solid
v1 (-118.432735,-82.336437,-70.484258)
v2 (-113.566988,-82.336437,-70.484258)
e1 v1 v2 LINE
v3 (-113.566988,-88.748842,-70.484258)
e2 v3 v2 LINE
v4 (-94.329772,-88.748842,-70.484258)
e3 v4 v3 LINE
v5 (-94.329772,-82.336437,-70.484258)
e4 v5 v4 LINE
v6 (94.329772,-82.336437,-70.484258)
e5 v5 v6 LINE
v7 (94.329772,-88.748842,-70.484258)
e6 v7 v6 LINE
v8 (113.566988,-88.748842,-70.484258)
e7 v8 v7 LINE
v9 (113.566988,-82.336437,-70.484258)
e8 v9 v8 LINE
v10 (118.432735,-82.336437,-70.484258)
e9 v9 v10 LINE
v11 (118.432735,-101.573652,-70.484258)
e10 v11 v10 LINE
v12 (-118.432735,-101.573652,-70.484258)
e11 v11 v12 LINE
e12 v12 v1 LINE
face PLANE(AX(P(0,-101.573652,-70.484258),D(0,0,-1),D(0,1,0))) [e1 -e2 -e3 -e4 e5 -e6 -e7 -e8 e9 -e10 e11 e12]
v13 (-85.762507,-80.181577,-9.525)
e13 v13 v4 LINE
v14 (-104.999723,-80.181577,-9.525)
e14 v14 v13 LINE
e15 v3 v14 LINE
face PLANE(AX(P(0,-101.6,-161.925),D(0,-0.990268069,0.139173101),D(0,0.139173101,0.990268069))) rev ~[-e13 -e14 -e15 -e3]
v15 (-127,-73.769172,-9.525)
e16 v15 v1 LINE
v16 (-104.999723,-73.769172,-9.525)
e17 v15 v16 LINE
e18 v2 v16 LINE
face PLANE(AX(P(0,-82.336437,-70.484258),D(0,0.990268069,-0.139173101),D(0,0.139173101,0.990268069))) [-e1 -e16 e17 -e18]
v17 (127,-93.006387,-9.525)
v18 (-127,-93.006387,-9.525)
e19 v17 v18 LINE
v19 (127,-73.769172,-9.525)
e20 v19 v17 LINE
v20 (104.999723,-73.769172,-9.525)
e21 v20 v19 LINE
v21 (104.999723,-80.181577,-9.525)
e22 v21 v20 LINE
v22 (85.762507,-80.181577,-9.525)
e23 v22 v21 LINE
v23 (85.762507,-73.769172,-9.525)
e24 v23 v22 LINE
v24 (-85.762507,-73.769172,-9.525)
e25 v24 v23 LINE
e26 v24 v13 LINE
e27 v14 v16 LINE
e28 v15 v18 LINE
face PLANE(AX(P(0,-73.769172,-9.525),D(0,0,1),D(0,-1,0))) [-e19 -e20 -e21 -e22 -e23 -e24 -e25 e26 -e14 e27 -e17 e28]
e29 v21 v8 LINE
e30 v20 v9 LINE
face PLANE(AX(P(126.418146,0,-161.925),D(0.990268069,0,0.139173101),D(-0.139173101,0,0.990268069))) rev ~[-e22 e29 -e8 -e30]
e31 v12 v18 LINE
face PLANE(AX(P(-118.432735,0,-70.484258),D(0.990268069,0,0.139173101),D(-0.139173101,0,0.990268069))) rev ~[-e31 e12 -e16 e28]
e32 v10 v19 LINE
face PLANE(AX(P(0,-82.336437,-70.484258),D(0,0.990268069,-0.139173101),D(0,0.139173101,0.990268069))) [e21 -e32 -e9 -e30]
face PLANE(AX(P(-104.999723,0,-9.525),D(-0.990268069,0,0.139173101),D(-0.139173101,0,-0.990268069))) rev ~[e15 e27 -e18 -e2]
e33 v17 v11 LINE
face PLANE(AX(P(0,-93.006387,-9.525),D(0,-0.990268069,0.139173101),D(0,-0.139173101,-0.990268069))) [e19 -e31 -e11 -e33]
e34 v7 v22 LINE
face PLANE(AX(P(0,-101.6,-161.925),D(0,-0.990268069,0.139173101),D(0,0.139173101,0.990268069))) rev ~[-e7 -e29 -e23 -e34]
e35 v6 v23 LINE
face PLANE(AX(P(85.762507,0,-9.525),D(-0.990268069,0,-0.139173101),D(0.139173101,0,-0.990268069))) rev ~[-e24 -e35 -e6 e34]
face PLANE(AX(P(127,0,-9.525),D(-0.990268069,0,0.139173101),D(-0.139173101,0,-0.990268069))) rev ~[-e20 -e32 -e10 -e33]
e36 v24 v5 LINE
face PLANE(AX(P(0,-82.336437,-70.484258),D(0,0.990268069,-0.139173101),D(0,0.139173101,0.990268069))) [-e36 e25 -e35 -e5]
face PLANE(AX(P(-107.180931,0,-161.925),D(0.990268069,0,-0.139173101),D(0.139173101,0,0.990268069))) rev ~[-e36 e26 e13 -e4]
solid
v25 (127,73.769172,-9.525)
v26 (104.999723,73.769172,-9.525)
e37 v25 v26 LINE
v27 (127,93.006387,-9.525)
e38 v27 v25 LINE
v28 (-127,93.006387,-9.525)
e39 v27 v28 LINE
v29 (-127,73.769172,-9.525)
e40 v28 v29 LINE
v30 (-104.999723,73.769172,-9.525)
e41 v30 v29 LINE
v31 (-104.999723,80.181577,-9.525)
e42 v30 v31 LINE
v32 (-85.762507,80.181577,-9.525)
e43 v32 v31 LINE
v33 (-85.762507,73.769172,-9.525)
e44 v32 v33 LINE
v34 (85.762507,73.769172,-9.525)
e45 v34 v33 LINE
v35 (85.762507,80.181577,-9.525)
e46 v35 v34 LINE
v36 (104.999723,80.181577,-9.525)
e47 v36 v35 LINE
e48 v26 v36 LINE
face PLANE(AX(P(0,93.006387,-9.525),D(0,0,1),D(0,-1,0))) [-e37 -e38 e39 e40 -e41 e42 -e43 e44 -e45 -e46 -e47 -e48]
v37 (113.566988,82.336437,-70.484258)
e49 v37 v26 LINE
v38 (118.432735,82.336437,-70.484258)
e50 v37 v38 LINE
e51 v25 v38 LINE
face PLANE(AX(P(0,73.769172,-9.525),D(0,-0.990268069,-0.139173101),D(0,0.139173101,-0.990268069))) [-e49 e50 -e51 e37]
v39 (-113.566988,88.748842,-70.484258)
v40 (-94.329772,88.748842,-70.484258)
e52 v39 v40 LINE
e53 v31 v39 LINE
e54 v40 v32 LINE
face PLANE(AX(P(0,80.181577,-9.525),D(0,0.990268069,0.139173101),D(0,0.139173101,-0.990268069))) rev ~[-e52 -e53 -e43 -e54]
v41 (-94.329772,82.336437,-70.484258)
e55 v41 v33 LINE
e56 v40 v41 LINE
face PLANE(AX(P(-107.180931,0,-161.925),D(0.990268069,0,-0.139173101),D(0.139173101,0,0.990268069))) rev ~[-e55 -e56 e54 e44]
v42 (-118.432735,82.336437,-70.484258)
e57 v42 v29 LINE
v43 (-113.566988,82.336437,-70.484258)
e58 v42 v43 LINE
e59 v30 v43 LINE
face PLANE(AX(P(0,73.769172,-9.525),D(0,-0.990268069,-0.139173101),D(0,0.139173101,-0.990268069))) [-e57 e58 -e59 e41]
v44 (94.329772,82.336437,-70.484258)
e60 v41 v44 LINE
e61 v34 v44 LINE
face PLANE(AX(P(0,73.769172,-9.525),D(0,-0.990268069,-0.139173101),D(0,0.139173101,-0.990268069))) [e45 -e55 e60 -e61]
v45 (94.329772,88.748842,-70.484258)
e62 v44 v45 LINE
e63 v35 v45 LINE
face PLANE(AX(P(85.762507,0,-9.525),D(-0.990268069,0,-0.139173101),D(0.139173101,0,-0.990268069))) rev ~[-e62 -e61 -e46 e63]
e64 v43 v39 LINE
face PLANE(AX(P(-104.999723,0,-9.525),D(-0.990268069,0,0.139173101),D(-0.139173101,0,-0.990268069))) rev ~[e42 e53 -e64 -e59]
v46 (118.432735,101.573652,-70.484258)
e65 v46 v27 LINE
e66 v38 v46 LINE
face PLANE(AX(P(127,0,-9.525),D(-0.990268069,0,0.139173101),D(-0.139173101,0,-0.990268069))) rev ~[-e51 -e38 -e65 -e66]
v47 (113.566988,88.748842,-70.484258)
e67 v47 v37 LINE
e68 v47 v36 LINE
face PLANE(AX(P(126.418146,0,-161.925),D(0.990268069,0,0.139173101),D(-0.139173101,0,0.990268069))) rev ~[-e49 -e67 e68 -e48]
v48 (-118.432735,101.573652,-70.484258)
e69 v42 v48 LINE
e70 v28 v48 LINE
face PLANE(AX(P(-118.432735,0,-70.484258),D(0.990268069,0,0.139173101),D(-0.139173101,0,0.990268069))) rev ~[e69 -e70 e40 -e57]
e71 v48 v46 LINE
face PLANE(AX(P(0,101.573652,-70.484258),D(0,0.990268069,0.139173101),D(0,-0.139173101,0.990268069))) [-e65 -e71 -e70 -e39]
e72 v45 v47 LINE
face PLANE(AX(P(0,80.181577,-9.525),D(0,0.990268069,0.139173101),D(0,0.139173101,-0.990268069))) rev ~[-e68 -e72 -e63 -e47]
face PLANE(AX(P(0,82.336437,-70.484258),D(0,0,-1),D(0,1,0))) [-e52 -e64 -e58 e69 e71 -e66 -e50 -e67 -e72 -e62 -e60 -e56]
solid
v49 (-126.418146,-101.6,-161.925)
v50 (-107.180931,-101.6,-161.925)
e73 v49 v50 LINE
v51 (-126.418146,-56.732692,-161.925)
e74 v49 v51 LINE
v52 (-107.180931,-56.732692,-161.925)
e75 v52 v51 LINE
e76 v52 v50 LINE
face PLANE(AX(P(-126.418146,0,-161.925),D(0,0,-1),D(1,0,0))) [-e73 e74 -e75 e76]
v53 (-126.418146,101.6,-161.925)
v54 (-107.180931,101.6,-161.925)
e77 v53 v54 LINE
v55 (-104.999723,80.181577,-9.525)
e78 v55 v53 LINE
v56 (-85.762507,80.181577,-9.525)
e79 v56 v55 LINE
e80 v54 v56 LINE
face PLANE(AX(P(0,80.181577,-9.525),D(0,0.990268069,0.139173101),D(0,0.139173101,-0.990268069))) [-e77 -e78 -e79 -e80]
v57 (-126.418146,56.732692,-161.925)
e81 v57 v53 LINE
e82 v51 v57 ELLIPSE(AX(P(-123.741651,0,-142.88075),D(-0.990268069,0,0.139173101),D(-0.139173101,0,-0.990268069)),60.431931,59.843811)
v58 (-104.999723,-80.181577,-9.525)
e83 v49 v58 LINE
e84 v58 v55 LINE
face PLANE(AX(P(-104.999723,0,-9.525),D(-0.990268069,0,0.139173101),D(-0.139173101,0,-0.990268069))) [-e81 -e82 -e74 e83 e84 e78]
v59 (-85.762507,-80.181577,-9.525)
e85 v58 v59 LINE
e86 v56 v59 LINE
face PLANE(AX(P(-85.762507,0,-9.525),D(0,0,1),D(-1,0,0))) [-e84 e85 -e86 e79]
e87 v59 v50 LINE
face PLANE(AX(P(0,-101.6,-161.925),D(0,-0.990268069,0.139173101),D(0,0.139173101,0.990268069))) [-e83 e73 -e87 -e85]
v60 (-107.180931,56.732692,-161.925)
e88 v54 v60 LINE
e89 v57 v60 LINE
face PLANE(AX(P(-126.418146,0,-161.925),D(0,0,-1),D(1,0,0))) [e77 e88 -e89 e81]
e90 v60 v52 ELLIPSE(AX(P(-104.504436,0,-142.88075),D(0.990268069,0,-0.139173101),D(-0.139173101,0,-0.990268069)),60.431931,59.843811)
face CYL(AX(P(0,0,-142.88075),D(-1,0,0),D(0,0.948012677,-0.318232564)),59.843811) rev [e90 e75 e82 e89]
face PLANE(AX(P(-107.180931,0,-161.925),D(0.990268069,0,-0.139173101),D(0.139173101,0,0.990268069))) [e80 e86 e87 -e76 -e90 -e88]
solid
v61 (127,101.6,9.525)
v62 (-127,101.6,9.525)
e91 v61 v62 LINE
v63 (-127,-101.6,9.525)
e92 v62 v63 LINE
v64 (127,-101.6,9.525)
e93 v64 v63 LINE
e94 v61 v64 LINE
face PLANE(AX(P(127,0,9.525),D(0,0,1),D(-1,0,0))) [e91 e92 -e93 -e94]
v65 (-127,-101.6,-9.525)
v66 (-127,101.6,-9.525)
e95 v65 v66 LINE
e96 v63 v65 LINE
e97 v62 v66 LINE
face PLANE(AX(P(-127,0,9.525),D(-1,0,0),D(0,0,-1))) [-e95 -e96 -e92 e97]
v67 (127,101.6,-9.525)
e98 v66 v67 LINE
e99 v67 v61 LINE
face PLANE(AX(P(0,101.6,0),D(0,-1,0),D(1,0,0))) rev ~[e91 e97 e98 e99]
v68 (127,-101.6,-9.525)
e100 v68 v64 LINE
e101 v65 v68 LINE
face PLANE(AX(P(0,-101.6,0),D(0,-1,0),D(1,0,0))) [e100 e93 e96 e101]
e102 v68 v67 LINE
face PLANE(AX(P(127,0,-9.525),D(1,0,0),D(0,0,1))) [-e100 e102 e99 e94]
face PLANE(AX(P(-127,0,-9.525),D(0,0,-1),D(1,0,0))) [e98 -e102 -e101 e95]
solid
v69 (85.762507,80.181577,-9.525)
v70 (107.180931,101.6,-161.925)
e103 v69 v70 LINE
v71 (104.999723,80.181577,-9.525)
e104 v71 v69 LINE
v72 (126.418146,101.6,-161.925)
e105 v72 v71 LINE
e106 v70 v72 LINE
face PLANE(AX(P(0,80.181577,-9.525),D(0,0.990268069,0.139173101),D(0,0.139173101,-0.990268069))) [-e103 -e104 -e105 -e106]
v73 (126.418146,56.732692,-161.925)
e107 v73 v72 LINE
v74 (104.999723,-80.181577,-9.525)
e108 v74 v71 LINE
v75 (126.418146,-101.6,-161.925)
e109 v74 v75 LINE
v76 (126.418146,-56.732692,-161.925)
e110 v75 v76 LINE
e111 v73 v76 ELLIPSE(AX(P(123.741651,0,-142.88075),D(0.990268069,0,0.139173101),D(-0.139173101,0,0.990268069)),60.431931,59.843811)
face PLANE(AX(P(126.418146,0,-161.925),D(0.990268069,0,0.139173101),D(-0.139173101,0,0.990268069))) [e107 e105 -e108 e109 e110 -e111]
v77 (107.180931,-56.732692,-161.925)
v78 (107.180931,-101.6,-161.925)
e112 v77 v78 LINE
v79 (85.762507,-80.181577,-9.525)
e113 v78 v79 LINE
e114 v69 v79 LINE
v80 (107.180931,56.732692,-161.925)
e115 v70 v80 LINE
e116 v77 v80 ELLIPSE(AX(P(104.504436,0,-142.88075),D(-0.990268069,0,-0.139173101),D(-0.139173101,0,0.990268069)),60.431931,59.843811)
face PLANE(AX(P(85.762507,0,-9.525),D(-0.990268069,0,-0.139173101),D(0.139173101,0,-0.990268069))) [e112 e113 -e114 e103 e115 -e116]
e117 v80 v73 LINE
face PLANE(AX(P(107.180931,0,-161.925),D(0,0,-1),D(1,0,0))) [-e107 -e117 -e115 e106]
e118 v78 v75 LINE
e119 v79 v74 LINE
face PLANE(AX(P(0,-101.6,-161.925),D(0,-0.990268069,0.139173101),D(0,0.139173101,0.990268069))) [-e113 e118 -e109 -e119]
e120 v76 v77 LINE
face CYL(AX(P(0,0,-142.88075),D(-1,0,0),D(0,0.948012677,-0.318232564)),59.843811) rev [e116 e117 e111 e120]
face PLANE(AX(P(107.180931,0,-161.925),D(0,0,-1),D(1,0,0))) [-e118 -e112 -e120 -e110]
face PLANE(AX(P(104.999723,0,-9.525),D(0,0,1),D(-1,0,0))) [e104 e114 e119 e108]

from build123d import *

# Parameters (mm, degrees)
F1_DEPTH       = 101.6
F2_DEPTH       = 101.6
F2_DEPTH_BACK  = 101.6
F4_DEPTH       = 127.001
F4_DEPTH_BACK  = 127.001
F6_DEPTH       = 127
F9_DEPTH       = 127.001
F9_DEPTH_BACK  = 127.001
F10_DEPTH      = 101.6010000004
F10_DEPTH_BACK = 101.6010000004


# Not quite as in the source:
# - a feature names something its author has since deleted; it is built from what else it names


with BuildPart() as f1:
    # F0 (on Front) → F1 (new body, symmetric)
    with BuildSketch(Plane.XZ):
        Polygon((127, -9.525), (127, 9.525), (-127, 9.525), (-127, -9.525), (-104.9997227219, -9.525), (-85.7625074654, -9.525), (0, -9.525), (85.7625074654, -9.525), (104.9997227219, -9.525), align=None)
    extrude(amount=F1_DEPTH, both=True)


with BuildPart() as f2:
    # F0 (on Front) → F2 (new body, two sides)
    with BuildSketch(Plane.XZ) as f2_sk:
        Polygon((-94.3297724402, -70.4842578052), (-113.5669876967, -70.4842578052), (-126.4181459306, -161.925), (-107.1809306741, -161.925), align=None)
        Polygon((-85.7625074654, -9.525), (-104.9997227219, -9.525), (-113.5669876967, -70.4842578052), (-94.3297724402, -70.4842578052), align=None)
    extrude(amount=F2_DEPTH)
    extrude(f2_sk.sketch, amount=-F2_DEPTH_BACK)


with BuildPart() as f2b:
    # F0 (on Front) → F2, piece 2 (new body, two sides)
    with BuildSketch(Plane.XZ) as f2_2_sk:
        Polygon((113.5669876967, -70.4842578052), (104.9997227219, -9.525), (85.7625074654, -9.525), (94.3297724402, -70.4842578052), align=None)
        Polygon((126.4181459306, -161.925), (113.5669876967, -70.4842578052), (94.3297724402, -70.4842578052), (107.1809306741, -161.925), align=None)
    extrude(amount=F2_DEPTH)
    extrude(f2_2_sk.sketch, amount=-F2_DEPTH_BACK)


with BuildPart() as f4_tool:
    # F3 (on Right) → F4 (new body, two sides)
    with BuildSketch(Plane.YZ) as f4_sk:
        Polygon((-101.6000000004, -161.925), (-80.1815767917, -9.525), (-101.6000000004, -9.525), align=None)
        Polygon((101.5999999998, -161.925), (101.5999999997, -9.525), (80.1815767917, -9.525), align=None)
    extrude(amount=-F4_DEPTH)
    extrude(f4_sk.sketch, amount=F4_DEPTH_BACK)


with BuildPart() as f2_1:
    add(f2.part)

    # F4: cut by f4_tool
    add(f4_tool.part, mode=Mode.SUBTRACT)


with BuildPart() as f2b_1:
    add(f2b.part)

    # F4: cut by f4_tool
    add(f4_tool.part, mode=Mode.SUBTRACT)


with BuildPart() as f6:
    # F5 (on Right) → F6 (new body, symmetric)
    with BuildSketch(Plane.YZ):
        Polygon((80.1815767913, -9.525), (73.7691717062, -9.525), (82.336436681, -70.4842578052), (101.5736519375, -70.4842578052), (93.0063869627, -9.525), align=None)
    extrude(amount=F6_DEPTH, both=True)

    # F7: cut F2
    add(f2_1.part, mode=Mode.SUBTRACT)

    # F8: cut F2b
    add(f2b_1.part, mode=Mode.SUBTRACT)


with BuildPart() as f6b:
    # F5 (on Right) → F6, piece 2 (new body, symmetric)
    with BuildSketch(Plane.YZ):
        Polygon((-101.5736519375, -70.4842578052), (-82.336436681, -70.4842578052), (-73.7691717062, -9.525), (-80.1815767915, -9.525), (-93.0063869627, -9.525), align=None)
    extrude(amount=F6_DEPTH, both=True)

    # F7: cut F2
    add(f2_1.part, mode=Mode.SUBTRACT)

    # F8: cut F2b
    add(f2b_1.part, mode=Mode.SUBTRACT)


with BuildPart() as f9_tool:
    # F3 (on Right) → F9 (new body, two sides)
    with BuildSketch(Plane.YZ) as f9_sk:
        with BuildLine():
            Line((-56.7326918244, -161.925), (56.7326918244, -161.925))
            ThreePointArc((56.7326918244, -161.925), (0, -83.0369391017), (-56.7326918244, -161.925))
        make_face()
    extrude(amount=-F9_DEPTH)
    extrude(f9_sk.sketch, amount=F9_DEPTH_BACK)


with BuildPart() as f2_2:
    add(f2_1.part)

    # F9: cut by f9_tool
    add(f9_tool.part, mode=Mode.SUBTRACT)


with BuildPart() as f2b_2:
    add(f2b_1.part)

    # F9: cut by f9_tool
    add(f9_tool.part, mode=Mode.SUBTRACT)


with BuildPart() as f10_tool:
    # F0 (on Front) → F10 (new body, two sides)
    with BuildSketch(Plane.XZ) as f10_sk:
        Polygon((127, -70.4842578052), (127, -9.525), (118.4327350252, -70.4842578052), align=None)
        Polygon((-118.4327350252, -70.4842578052), (-127, -9.525), (-127, -70.4842578052), align=None)
    extrude(amount=F10_DEPTH)
    extrude(f10_sk.sketch, amount=-F10_DEPTH_BACK)


with BuildPart() as f6_1:
    add(f6.part)

    # F10: cut by f10_tool
    add(f10_tool.part, mode=Mode.SUBTRACT)


with BuildPart() as f6b_1:
    add(f6b.part)

    # F10: cut by f10_tool
    add(f10_tool.part, mode=Mode.SUBTRACT)


solid = Compound([f1.part, f2_2.part, f2b_2.part, f6_1.part, f6b_1.part])
